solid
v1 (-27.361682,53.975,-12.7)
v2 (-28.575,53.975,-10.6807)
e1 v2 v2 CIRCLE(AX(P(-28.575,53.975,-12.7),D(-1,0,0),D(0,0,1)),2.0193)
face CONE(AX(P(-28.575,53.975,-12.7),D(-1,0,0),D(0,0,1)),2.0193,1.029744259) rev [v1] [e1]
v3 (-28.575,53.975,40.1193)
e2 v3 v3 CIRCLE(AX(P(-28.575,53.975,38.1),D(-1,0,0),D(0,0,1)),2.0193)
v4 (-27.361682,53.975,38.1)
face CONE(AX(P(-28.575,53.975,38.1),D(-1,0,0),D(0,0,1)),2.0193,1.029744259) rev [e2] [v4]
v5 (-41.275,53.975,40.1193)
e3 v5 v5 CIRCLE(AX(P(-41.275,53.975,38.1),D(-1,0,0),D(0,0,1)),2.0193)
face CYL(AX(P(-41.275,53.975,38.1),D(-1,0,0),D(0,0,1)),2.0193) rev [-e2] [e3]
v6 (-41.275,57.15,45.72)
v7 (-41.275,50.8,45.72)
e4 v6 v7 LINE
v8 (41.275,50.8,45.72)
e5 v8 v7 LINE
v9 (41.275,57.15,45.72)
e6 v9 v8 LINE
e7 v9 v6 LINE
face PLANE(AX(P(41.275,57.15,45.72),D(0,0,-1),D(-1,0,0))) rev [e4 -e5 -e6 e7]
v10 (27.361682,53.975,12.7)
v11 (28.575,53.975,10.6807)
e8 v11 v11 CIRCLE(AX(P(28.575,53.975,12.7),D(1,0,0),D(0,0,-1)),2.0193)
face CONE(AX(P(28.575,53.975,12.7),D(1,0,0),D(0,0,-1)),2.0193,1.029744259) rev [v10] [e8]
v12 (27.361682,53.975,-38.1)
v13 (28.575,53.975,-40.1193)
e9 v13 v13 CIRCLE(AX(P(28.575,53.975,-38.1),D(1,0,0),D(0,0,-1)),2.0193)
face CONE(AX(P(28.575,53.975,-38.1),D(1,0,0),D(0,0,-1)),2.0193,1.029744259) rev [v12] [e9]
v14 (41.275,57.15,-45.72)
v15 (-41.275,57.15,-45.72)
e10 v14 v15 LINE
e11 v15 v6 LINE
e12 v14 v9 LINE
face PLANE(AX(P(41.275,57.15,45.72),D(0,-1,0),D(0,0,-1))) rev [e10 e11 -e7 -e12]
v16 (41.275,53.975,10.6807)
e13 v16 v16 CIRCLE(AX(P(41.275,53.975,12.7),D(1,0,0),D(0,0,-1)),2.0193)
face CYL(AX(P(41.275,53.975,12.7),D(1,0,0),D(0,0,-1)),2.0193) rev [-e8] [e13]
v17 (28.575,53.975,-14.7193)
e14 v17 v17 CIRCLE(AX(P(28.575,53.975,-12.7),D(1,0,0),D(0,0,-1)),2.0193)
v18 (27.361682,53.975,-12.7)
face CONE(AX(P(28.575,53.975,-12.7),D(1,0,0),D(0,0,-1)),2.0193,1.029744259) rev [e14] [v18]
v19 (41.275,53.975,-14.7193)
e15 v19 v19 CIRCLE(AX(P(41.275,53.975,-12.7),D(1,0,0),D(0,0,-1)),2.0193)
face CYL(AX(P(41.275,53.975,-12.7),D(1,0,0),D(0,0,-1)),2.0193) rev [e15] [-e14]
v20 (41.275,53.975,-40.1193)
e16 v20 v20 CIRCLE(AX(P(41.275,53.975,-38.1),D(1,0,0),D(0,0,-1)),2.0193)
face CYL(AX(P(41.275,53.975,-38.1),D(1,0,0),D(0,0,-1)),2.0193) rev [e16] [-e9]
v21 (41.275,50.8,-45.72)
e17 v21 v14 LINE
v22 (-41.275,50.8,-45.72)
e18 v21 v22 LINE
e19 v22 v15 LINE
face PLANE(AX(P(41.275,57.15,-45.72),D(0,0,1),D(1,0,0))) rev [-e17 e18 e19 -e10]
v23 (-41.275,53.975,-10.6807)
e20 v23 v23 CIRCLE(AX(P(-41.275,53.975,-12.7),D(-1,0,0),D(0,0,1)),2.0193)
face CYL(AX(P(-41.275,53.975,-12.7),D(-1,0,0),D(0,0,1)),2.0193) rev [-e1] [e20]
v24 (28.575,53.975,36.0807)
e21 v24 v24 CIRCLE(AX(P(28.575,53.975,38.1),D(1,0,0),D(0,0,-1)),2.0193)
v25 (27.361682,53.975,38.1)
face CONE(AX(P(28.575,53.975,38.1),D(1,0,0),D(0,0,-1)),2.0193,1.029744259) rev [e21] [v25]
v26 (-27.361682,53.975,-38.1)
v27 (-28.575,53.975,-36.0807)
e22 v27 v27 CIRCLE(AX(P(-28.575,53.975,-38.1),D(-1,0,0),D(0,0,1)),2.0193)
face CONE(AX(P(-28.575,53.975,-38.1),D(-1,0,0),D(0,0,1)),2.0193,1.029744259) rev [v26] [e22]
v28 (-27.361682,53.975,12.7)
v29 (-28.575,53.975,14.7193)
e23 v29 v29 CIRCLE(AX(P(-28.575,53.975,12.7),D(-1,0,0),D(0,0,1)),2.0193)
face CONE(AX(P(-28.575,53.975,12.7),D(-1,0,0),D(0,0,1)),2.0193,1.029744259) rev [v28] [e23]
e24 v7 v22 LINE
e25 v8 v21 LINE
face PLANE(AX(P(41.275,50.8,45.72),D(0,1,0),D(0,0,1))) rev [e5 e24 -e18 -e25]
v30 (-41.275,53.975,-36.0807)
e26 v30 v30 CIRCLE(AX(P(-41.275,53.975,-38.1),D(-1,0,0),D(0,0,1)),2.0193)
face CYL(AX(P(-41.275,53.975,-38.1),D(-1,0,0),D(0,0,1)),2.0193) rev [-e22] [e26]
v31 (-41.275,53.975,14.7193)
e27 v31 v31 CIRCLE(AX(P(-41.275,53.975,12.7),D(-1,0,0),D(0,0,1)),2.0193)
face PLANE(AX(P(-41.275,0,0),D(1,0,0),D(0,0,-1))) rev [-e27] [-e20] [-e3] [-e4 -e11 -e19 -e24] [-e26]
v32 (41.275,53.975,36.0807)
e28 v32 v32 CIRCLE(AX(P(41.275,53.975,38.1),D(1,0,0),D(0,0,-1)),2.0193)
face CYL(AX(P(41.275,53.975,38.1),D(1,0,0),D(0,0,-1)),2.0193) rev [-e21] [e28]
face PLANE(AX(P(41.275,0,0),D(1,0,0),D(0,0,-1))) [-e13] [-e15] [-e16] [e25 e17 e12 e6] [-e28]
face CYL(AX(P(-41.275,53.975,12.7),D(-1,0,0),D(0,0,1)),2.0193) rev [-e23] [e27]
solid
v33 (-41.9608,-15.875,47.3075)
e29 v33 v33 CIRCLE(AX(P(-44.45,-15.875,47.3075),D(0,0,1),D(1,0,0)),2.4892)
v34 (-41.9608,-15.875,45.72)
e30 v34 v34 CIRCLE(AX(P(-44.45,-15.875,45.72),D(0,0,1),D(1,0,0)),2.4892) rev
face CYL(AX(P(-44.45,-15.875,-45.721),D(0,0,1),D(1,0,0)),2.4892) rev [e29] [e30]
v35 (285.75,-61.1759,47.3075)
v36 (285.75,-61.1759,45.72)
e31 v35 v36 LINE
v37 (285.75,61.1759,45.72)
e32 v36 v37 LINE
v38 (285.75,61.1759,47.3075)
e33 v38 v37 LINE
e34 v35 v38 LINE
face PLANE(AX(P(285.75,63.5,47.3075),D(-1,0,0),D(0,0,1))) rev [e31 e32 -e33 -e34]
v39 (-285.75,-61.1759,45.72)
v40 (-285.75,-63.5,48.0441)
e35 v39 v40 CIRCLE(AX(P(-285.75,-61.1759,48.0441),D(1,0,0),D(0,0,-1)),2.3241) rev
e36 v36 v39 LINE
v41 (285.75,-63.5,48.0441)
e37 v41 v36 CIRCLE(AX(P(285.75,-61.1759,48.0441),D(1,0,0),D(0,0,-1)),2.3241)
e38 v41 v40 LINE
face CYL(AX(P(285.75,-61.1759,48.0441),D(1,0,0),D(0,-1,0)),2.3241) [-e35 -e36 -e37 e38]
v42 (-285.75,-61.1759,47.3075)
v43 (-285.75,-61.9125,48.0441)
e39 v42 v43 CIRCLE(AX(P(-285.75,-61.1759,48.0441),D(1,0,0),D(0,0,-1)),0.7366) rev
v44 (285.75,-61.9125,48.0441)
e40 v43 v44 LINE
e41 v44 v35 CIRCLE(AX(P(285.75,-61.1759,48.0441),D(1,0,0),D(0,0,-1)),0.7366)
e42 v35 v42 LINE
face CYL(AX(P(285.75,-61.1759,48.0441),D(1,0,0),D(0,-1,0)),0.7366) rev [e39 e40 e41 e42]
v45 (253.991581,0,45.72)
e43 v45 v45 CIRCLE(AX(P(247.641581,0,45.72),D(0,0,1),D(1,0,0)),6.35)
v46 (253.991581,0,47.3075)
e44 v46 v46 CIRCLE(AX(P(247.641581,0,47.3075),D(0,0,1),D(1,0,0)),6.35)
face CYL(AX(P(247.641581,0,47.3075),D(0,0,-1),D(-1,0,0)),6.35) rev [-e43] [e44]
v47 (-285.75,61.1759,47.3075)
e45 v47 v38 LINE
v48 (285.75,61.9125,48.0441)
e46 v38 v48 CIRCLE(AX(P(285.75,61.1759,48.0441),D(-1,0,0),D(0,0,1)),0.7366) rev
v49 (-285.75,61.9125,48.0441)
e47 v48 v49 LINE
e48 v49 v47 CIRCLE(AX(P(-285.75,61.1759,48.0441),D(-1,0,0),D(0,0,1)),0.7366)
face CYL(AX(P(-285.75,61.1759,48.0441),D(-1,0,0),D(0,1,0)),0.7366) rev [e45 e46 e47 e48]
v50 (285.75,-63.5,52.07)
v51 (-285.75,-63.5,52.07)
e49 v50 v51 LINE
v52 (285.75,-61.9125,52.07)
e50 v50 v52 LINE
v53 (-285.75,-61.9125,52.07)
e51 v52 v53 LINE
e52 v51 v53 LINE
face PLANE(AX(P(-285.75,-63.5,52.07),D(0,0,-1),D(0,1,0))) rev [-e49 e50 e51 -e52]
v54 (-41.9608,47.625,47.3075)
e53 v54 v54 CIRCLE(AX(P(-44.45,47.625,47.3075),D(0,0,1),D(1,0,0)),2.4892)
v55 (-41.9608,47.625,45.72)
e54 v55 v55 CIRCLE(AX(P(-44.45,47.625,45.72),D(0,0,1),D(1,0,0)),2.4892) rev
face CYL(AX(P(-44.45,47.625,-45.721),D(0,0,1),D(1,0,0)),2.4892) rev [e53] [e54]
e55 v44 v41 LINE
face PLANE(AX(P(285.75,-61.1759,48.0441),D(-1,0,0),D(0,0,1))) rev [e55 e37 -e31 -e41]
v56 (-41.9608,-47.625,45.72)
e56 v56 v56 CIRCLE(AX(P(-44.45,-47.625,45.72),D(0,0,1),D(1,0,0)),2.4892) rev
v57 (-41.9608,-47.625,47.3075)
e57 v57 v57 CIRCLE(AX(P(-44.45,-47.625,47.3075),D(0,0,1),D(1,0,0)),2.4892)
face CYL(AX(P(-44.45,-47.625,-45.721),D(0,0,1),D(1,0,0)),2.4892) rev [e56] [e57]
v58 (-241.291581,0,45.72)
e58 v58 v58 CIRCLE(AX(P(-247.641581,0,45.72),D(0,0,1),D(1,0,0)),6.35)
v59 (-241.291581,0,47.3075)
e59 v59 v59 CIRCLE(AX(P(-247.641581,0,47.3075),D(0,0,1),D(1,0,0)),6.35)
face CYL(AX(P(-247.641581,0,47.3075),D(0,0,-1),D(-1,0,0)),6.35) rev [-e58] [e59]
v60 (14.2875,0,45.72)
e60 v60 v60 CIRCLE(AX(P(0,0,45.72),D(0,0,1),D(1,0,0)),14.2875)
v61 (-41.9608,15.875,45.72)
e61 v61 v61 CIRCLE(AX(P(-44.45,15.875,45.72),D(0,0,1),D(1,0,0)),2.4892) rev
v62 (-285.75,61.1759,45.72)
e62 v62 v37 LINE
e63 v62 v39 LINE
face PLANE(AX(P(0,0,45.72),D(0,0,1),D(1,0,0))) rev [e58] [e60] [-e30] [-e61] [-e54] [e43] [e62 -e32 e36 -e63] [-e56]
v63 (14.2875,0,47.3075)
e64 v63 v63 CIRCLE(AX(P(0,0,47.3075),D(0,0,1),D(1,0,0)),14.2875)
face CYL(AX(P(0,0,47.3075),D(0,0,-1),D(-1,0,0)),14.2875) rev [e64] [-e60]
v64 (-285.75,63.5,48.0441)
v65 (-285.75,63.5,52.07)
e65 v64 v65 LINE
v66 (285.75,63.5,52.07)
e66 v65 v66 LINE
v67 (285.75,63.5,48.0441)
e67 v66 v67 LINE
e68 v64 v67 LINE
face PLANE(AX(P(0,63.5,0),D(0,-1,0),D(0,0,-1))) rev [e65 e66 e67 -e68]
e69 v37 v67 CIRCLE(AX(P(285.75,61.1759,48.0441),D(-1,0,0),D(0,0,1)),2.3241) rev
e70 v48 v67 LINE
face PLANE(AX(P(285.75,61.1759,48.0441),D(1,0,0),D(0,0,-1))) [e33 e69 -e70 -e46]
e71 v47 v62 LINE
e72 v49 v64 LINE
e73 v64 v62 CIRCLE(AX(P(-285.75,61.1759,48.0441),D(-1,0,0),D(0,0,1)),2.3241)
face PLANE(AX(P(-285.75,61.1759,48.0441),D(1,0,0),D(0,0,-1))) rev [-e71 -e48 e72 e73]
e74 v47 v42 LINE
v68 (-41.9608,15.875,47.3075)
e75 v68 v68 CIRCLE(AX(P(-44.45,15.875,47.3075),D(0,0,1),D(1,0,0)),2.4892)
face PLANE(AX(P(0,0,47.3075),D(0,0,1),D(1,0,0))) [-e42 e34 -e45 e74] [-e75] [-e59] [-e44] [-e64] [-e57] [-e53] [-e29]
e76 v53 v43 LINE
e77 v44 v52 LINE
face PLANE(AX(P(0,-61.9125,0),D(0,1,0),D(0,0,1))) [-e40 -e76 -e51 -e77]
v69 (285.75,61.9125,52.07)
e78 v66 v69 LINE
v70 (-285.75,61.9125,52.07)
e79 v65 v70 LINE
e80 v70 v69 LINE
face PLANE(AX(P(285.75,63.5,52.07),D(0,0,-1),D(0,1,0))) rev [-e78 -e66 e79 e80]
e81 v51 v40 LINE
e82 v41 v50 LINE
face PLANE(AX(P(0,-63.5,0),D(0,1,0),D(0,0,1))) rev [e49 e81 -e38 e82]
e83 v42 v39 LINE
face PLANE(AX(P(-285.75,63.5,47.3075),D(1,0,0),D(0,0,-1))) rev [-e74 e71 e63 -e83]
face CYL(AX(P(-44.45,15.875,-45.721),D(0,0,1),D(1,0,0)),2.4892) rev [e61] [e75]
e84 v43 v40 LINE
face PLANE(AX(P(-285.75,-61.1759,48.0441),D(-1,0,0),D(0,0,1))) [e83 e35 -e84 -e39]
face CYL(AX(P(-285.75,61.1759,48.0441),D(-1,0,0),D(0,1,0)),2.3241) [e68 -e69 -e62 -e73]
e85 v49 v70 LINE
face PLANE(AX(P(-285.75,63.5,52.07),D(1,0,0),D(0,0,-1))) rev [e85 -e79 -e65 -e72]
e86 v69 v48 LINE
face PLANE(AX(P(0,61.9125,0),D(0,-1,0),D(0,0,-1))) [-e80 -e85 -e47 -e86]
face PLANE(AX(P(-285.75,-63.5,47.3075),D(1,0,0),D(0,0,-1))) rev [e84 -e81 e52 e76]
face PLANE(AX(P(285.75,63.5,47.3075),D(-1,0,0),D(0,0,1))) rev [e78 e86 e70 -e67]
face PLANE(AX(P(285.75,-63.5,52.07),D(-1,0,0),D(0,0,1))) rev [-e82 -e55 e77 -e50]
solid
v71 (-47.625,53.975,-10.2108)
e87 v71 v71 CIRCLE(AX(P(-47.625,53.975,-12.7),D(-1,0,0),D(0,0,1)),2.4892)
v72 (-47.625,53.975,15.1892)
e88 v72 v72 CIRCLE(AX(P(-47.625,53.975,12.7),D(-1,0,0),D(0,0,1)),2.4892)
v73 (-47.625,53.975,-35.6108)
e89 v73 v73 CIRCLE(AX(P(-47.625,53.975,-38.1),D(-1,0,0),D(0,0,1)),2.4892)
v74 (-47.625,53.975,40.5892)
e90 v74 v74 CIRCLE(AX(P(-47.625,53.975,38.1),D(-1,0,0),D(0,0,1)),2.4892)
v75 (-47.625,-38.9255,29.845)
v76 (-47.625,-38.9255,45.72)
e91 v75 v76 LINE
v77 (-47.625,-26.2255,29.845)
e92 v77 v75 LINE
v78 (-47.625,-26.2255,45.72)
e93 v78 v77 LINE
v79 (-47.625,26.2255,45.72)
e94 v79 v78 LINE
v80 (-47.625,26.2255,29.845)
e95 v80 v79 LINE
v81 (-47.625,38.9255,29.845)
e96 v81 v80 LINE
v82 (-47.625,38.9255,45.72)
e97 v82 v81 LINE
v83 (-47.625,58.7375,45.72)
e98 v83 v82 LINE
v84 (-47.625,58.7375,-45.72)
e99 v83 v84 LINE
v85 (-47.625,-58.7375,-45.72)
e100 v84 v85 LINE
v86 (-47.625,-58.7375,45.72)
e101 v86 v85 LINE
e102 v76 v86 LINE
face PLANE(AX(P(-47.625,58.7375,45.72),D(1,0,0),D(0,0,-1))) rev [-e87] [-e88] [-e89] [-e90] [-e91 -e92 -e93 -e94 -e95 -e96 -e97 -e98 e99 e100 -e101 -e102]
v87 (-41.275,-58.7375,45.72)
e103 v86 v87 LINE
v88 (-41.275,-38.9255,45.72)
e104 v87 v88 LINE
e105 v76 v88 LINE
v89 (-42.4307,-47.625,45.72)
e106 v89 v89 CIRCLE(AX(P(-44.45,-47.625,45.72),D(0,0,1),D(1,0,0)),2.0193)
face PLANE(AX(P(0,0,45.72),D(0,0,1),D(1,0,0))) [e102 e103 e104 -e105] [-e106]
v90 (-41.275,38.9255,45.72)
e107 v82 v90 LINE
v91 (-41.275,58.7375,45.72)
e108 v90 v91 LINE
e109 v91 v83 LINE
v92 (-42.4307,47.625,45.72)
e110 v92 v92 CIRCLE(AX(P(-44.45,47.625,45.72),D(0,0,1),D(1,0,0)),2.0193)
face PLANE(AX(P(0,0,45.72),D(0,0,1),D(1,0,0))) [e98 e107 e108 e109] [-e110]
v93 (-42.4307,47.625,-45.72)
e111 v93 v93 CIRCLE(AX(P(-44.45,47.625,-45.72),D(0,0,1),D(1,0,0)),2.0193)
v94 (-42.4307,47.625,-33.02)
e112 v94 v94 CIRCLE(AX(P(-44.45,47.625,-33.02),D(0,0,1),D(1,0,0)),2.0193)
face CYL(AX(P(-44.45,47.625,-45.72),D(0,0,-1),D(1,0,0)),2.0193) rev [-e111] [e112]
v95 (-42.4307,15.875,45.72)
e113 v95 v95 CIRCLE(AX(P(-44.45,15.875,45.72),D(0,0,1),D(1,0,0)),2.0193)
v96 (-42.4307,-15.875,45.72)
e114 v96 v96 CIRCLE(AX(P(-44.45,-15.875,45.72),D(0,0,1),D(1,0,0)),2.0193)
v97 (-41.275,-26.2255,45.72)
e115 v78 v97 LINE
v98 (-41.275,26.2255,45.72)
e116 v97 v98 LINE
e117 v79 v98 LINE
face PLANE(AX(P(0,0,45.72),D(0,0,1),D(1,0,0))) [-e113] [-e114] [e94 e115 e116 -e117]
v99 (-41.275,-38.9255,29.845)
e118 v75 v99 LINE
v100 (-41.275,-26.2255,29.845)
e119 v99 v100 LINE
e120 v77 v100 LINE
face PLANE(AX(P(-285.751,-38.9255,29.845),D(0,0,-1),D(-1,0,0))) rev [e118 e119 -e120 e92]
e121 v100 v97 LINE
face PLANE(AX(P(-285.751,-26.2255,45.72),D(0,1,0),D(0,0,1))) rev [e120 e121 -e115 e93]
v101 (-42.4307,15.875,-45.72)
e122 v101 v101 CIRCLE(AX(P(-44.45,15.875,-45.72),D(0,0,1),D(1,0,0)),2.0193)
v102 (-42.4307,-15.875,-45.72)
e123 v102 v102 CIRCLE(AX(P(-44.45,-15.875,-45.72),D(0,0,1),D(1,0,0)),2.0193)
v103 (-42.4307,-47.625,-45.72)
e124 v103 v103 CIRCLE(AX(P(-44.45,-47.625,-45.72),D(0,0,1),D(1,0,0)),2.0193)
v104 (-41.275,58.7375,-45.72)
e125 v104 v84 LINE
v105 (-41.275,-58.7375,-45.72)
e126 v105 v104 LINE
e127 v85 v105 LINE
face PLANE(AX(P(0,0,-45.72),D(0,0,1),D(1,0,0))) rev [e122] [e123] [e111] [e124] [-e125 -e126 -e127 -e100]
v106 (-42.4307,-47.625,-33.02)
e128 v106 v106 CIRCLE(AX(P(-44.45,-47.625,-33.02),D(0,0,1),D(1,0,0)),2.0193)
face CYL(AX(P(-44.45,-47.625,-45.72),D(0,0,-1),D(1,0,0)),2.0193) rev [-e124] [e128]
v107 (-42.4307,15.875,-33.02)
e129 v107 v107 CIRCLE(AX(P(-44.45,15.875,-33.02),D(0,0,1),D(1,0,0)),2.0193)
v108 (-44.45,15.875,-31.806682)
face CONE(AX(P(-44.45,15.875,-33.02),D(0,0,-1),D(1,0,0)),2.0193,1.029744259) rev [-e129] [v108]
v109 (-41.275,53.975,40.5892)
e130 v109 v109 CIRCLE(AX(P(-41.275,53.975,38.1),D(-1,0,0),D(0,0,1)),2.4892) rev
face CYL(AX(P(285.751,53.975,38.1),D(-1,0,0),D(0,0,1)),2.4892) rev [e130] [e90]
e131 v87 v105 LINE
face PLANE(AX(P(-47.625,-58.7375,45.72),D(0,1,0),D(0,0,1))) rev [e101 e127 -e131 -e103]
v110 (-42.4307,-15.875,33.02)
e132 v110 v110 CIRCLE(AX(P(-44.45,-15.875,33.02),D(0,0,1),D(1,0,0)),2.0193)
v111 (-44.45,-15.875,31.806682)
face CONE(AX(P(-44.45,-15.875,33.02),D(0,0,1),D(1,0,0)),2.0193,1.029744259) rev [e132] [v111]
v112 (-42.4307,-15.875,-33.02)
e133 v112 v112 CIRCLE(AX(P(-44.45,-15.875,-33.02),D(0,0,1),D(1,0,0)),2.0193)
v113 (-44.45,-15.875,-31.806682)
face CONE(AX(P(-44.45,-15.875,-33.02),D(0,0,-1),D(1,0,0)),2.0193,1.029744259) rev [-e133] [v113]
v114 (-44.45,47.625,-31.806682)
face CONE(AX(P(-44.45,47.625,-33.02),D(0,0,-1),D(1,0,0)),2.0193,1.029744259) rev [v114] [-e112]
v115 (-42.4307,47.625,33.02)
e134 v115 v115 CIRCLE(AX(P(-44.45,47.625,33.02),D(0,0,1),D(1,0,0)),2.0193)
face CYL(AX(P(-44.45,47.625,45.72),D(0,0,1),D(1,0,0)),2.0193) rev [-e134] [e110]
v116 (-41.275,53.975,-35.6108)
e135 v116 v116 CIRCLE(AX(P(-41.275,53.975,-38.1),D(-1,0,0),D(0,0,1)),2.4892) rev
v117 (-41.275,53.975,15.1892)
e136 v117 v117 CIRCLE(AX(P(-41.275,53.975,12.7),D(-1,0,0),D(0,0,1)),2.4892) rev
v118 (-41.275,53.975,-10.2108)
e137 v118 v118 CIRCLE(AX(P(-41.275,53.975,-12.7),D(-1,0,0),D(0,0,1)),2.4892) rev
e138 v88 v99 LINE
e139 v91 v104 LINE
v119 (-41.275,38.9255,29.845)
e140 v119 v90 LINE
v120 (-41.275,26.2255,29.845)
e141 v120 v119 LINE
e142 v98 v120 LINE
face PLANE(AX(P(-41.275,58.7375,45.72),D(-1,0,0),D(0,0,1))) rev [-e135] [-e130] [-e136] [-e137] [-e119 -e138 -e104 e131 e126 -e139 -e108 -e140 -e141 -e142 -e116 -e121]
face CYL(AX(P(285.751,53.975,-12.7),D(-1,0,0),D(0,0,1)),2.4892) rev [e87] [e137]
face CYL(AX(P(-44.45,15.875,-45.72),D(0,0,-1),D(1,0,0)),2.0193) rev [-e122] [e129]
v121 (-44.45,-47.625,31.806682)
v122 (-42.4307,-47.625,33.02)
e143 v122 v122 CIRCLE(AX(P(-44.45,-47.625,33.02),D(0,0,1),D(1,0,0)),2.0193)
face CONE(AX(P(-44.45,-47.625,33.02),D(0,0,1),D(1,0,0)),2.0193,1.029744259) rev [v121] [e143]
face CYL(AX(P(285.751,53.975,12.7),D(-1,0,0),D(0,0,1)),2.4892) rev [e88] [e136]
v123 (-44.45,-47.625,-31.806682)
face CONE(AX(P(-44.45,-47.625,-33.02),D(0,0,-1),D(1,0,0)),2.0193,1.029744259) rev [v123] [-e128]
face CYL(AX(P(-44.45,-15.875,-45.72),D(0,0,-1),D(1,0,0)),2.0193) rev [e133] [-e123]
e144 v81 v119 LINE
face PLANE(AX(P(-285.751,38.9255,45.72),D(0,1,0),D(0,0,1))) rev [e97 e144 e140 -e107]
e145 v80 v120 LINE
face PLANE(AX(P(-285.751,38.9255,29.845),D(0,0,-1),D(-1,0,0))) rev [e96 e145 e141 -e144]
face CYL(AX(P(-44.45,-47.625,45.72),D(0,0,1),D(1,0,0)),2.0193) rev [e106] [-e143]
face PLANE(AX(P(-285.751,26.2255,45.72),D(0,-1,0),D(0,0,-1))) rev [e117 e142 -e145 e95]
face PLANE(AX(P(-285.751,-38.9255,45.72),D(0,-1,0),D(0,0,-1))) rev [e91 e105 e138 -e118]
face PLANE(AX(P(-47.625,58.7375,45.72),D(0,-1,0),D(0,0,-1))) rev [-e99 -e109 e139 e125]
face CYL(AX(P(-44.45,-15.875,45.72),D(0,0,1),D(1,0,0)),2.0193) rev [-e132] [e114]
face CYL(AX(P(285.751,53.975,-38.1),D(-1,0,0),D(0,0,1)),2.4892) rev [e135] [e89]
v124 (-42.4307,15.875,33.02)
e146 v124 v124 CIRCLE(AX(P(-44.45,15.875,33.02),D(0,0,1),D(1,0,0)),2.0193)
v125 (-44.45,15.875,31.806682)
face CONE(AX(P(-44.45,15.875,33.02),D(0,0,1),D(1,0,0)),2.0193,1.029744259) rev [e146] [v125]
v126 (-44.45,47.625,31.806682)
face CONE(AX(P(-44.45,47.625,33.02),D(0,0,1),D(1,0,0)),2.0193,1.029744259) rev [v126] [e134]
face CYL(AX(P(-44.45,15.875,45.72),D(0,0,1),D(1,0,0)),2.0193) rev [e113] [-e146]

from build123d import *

# Parameters (mm, degrees)
SKETCH2_W                       = 571.5
SKETCH2_H                       = 127
SKETCH2_R                       = 6.35
SKETCH2_R_2                     = 14.2875
BASE_FLANGE1_DEPTH              = 1.5875
EDGE_FLANGE1_STRIP_W            = 7.8232
EDGE_FLANGE1_STRIP_H            = 1.5875
EDGE_FLANGE1_STRIP_CUT_DEPTH    = 571.5
EDGE_FLANGE1_DEPTH              = 571.5
EDGE_FLANGE3_STRIP_W            = 7.8232
EDGE_FLANGE3_STRIP_H            = 1.5875
EDGE_FLANGE3_STRIP_CUT_DEPTH    = 571.5
EDGE_FLANGE3_DEPTH              = 571.5
SKETCH18_W                      = 6.35
SKETCH18_H                      = 117.475
BOSS_EXTRUDE1_DEPTH             = 45.72
SKETCH24_W                      = 15.875
SKETCH24_H                      = 12.7
CUT_EXTRUDE1_DEPTH              = 6.35
SKETCH25_R                      = 2.4892
CUT_EXTRUDE2_DEPTH              = 1.5875
F_10_32_TAPPED_HOLE1_AT_2_COUNT = 2
F_10_32_TAPPED_HOLE1_AT_2_PITCH = 31.75
F_10_32_TAPPED_HOLE1_AT_3_COUNT = 2
F_10_32_TAPPED_HOLE1_AT_3_PITCH = 63.5
F_10_32_TAPPED_HOLE1_AT_4_COUNT = 2
F_10_32_TAPPED_HOLE1_AT_4_PITCH = 95.25
SKETCH29_W                      = 91.44
SKETCH29_H                      = 6.35
BOSS_EXTRUDE2_DEPTH             = 82.55
SKETCH32_R                      = 2.4892
CUT_EXTRUDE3_DEPTH              = 6.35
F_10_32_TAPPED_HOLE2_AT_2_COUNT = 2
F_10_32_TAPPED_HOLE2_AT_2_PITCH = 25.4
F_10_32_TAPPED_HOLE2_AT_3_COUNT = 2
F_10_32_TAPPED_HOLE2_AT_3_PITCH = 50.8
F_10_32_TAPPED_HOLE2_AT_4_COUNT = 2
F_10_32_TAPPED_HOLE2_AT_4_PITCH = 76.2


# Sheet-metal steps are written as plain solids
with BuildPart() as part:
    # Sketch2 → Base-Flange1 (new body)
    with BuildSketch(Plane.XY.offset(45.72)):
        Rectangle(SKETCH2_W, SKETCH2_H)
        with Locations((-247.641580503, 0)):
            Circle(SKETCH2_R, mode=Mode.SUBTRACT)
        Circle(SKETCH2_R_2, mode=Mode.SUBTRACT)
        with Locations((247.641580503, 0)):
            Circle(SKETCH2_R, mode=Mode.SUBTRACT)
    extrude(amount=BASE_FLANGE1_DEPTH)

    # Edge-Flange1 strip (across the edge) → Edge-Flange1 strip cut (cut)
    with BuildSketch(Plane(origin=(285.75, 63.5, 47.3075), x_dir=(0, -1, 0), z_dir=(-1, 0, 0))):
        with Locations((-1.5875, -0.79375)):
            Rectangle(EDGE_FLANGE1_STRIP_W, EDGE_FLANGE1_STRIP_H)
    extrude(amount=EDGE_FLANGE1_STRIP_CUT_DEPTH, mode=Mode.SUBTRACT)

    # Edge-Flange1 section (across the edge) → Edge-Flange1 (add)
    with BuildSketch(Plane(origin=(285.75, 63.5, 47.3075), x_dir=(0, -1, 0), z_dir=(-1, 0, 0))):
        with BuildLine():
            Line((0, 0.7366), (0, 4.7625))
            Line((0, 4.7625), (1.5875, 4.7625))
            Line((1.5875, 4.7625), (1.5875, 0.7366))
            ThreePointArc((1.5875, 0.7366), (1.803245145, 0.215745145), (2.3241, 0))
            Line((2.3241, 0), (2.3241, -1.5875))
            ThreePointArc((2.3241, -1.5875), (0.68071313, -0.90678687), (0, 0.7366))
        make_face()
    extrude(amount=EDGE_FLANGE1_DEPTH)

    # Edge-Flange3 strip (across the edge) → Edge-Flange3 strip cut (cut)
    with BuildSketch(Plane(origin=(-285.75, -63.5, 47.3075), x_dir=(0, 1, 0), z_dir=(1, 0, 0))):
        with Locations((-1.5875, -0.79375)):
            Rectangle(EDGE_FLANGE3_STRIP_W, EDGE_FLANGE3_STRIP_H)
    extrude(amount=EDGE_FLANGE3_STRIP_CUT_DEPTH, mode=Mode.SUBTRACT)

    # Edge-Flange3 section (across the edge) → Edge-Flange3 (add)
    with BuildSketch(Plane(origin=(-285.75, -63.5, 47.3075), x_dir=(0, 1, 0), z_dir=(1, 0, 0))):
        with BuildLine():
            Line((0, 0.7366), (0, 4.7625))
            Line((0, 4.7625), (1.5875, 4.7625))
            Line((1.5875, 4.7625), (1.5875, 0.7366))
            ThreePointArc((1.5875, 0.7366), (1.803245145, 0.215745145), (2.3241, 0))
            Line((2.3241, 0), (2.3241, -1.5875))
            ThreePointArc((2.3241, -1.5875), (0.68071313, -0.90678687), (0, 0.7366))
        make_face()
    extrude(amount=EDGE_FLANGE3_DEPTH)

    # Sketch25 → Cut-Extrude2 (cut)
    with BuildSketch(Plane.XY.offset(47.3075)):
        with Locations((-44.45, 47.625)):
            Circle(SKETCH25_R)
        with Locations((-44.45, 15.875)):
            Circle(SKETCH25_R)
        with Locations((-44.45, -15.875)):
            Circle(SKETCH25_R)
        with Locations((-44.45, -47.625)):
            Circle(SKETCH25_R)
    extrude(amount=-CUT_EXTRUDE2_DEPTH, mode=Mode.SUBTRACT)


with BuildPart() as body_2:
    # Sketch18 → Boss-Extrude1 (new, symmetric)
    with BuildSketch(Plane.XY):
        with Locations((-44.45, 0)):
            Rectangle(SKETCH18_W, SKETCH18_H)
    extrude(amount=BOSS_EXTRUDE1_DEPTH, both=True)

    # Sketch24 → Cut-Extrude1 (cut)
    with BuildSketch(Plane(origin=(-41.275, 0, 0), x_dir=(0, 0, -1), z_dir=(1, 0, 0))):
        with Locations((-37.7825, 32.5755)):
            Rectangle(SKETCH24_W, SKETCH24_H)
        with Locations((-37.7825, -32.5755)):
            Rectangle(SKETCH24_W, SKETCH24_H)
    extrude(amount=-CUT_EXTRUDE1_DEPTH, mode=Mode.SUBTRACT)

    # Sketch28 → #10-32 Tapped Hole1 (revolve, cut)
    with BuildSketch(Plane(origin=(-44.45, 47.625, 45.72), x_dir=(0, -1, 0), z_dir=(1, 0, 0))):
        Polygon((0, 0), (0, 13.913317848), (2.0193, 12.7), (2.0193, 0), align=None)
    f_10_32_tapped_hole1 = revolve(axis=Axis((-44.45, 47.625, 52.07), (0, 0, -1)), mode=Mode.SUBTRACT)

    # #10-32 Tapped Hole1 at 2: #10-32 Tapped Hole1 ×2
    with Locations(*[(0, -i * F_10_32_TAPPED_HOLE1_AT_2_PITCH, 0) for i in range(1, F_10_32_TAPPED_HOLE1_AT_2_COUNT)]):
        add(f_10_32_tapped_hole1, mode=Mode.SUBTRACT)

    # #10-32 Tapped Hole1 at 3: #10-32 Tapped Hole1 ×2
    with Locations(*[(0, -i * F_10_32_TAPPED_HOLE1_AT_3_PITCH, 0) for i in range(1, F_10_32_TAPPED_HOLE1_AT_3_COUNT)]):
        add(f_10_32_tapped_hole1, mode=Mode.SUBTRACT)

    # #10-32 Tapped Hole1 at 4: #10-32 Tapped Hole1 ×2
    with Locations(*[(0, -i * F_10_32_TAPPED_HOLE1_AT_4_PITCH, 0) for i in range(1, F_10_32_TAPPED_HOLE1_AT_4_COUNT)]):
        add(f_10_32_tapped_hole1, mode=Mode.SUBTRACT)

    # Sketch32 → Cut-Extrude3 (cut)
    with BuildSketch(Plane.ZY.offset(47.625)):
        with Locations((-38.1, 53.975)):
            Circle(SKETCH32_R)
        with Locations((-12.7, 53.975)):
            Circle(SKETCH32_R)
        with Locations((12.7, 53.975)):
            Circle(SKETCH32_R)
        with Locations((38.1, 53.975)):
            Circle(SKETCH32_R)
    extrude(amount=-CUT_EXTRUDE3_DEPTH, mode=Mode.SUBTRACT)

    # Mirror2: #10-32 Tapped Hole1 across plane
    add(f_10_32_tapped_hole1.mirror(Plane.XY), mode=Mode.SUBTRACT)

    # Mirror2 copy 1 sketch → Mirror2 copy 1 (revolve, cut)
    with BuildSketch(Plane(origin=(-44.45, 15.875, -45.72), x_dir=(0, -1, 0), z_dir=(1, 0, 0))):
        Polygon((0, 0), (0, -13.913317848), (2.0193, -12.7), (2.0193, 0), align=None)
    revolve(axis=Axis((-44.45, 15.875, -52.07), (0, 0, -1)), mode=Mode.SUBTRACT)

    # Mirror2 copy 2 sketch → Mirror2 copy 2 (revolve, cut)
    with BuildSketch(Plane(origin=(-44.45, -15.875, -45.72), x_dir=(0, -1, 0), z_dir=(1, 0, 0))):
        Polygon((0, 0), (0, -13.913317848), (2.0193, -12.7), (2.0193, 0), align=None)
    revolve(axis=Axis((-44.45, -15.875, -52.07), (0, 0, -1)), mode=Mode.SUBTRACT)

    # Mirror2 copy 3 sketch → Mirror2 copy 3 (revolve, cut)
    with BuildSketch(Plane(origin=(-44.45, -47.625, -45.72), x_dir=(0, -1, 0), z_dir=(1, 0, 0))):
        Polygon((0, 0), (0, -13.913317848), (2.0193, -12.7), (2.0193, 0), align=None)
    revolve(axis=Axis((-44.45, -47.625, -52.07), (0, 0, -1)), mode=Mode.SUBTRACT)


with BuildPart() as body_3:
    # Sketch29 → Boss-Extrude2 (new body)
    with BuildSketch(Plane(origin=(-41.275, 0, 0), x_dir=(0, 0, -1), z_dir=(1, 0, 0))):
        with Locations((0, 53.975)):
            Rectangle(SKETCH29_W, SKETCH29_H)
    extrude(amount=BOSS_EXTRUDE2_DEPTH)

    # Sketch34 → #10-32 Tapped Hole2 (revolve, cut)
    with BuildSketch(Plane(origin=(-41.275, 53.975, -38.1), x_dir=(0, 0, 1), z_dir=(0, 1, 0))):
        Polygon((0, 0), (0, 13.913317848), (2.0193, 12.7), (2.0193, 0), align=None)
    f_10_32_tapped_hole2 = revolve(axis=Axis((-47.625, 53.975, -38.1), (1, 0, 0)), mode=Mode.SUBTRACT)

    # #10-32 Tapped Hole2 at 2: #10-32 Tapped Hole2 ×2
    with Locations(*[(0, 0, i * F_10_32_TAPPED_HOLE2_AT_2_PITCH) for i in range(1, F_10_32_TAPPED_HOLE2_AT_2_COUNT)]):
        add(f_10_32_tapped_hole2, mode=Mode.SUBTRACT)

    # #10-32 Tapped Hole2 at 3: #10-32 Tapped Hole2 ×2
    with Locations(*[(0, 0, i * F_10_32_TAPPED_HOLE2_AT_3_PITCH) for i in range(1, F_10_32_TAPPED_HOLE2_AT_3_COUNT)]):
        add(f_10_32_tapped_hole2, mode=Mode.SUBTRACT)

    # #10-32 Tapped Hole2 at 4: #10-32 Tapped Hole2 ×2
    with Locations(*[(0, 0, i * F_10_32_TAPPED_HOLE2_AT_4_PITCH) for i in range(1, F_10_32_TAPPED_HOLE2_AT_4_COUNT)]):
        add(f_10_32_tapped_hole2, mode=Mode.SUBTRACT)

    # Mirror1: #10-32 Tapped Hole2 across plane
    add(f_10_32_tapped_hole2.mirror(Plane(origin=(0, 0, 0), x_dir=(0, 0, 1), z_dir=(1, 0, 0))), mode=Mode.SUBTRACT)

    # Mirror1 copy 1 sketch → Mirror1 copy 1 (revolve, cut)
    with BuildSketch(Plane(origin=(41.275, 53.975, -12.7), x_dir=(0, 0, 1), z_dir=(0, 1, 0))):
        Polygon((0, 0), (0, -13.913317848), (2.0193, -12.7), (2.0193, 0), align=None)
    revolve(axis=Axis((47.625, 53.975, -12.7), (1, 0, 0)), mode=Mode.SUBTRACT)

    # Mirror1 copy 2 sketch → Mirror1 copy 2 (revolve, cut)
    with BuildSketch(Plane(origin=(41.275, 53.975, 12.7), x_dir=(0, 0, 1), z_dir=(0, 1, 0))):
        Polygon((0, 0), (0, -13.913317848), (2.0193, -12.7), (2.0193, 0), align=None)
    revolve(axis=Axis((47.625, 53.975, 12.7), (1, 0, 0)), mode=Mode.SUBTRACT)

    # Mirror1 copy 3 sketch → Mirror1 copy 3 (revolve, cut)
    with BuildSketch(Plane(origin=(41.275, 53.975, 38.1), x_dir=(0, 0, 1), z_dir=(0, 1, 0))):
        Polygon((0, 0), (0, -13.913317848), (2.0193, -12.7), (2.0193, 0), align=None)
    revolve(axis=Axis((47.625, 53.975, 38.1), (1, 0, 0)), mode=Mode.SUBTRACT)


solid = Compound([part.part, body_2.part, body_3.part])
